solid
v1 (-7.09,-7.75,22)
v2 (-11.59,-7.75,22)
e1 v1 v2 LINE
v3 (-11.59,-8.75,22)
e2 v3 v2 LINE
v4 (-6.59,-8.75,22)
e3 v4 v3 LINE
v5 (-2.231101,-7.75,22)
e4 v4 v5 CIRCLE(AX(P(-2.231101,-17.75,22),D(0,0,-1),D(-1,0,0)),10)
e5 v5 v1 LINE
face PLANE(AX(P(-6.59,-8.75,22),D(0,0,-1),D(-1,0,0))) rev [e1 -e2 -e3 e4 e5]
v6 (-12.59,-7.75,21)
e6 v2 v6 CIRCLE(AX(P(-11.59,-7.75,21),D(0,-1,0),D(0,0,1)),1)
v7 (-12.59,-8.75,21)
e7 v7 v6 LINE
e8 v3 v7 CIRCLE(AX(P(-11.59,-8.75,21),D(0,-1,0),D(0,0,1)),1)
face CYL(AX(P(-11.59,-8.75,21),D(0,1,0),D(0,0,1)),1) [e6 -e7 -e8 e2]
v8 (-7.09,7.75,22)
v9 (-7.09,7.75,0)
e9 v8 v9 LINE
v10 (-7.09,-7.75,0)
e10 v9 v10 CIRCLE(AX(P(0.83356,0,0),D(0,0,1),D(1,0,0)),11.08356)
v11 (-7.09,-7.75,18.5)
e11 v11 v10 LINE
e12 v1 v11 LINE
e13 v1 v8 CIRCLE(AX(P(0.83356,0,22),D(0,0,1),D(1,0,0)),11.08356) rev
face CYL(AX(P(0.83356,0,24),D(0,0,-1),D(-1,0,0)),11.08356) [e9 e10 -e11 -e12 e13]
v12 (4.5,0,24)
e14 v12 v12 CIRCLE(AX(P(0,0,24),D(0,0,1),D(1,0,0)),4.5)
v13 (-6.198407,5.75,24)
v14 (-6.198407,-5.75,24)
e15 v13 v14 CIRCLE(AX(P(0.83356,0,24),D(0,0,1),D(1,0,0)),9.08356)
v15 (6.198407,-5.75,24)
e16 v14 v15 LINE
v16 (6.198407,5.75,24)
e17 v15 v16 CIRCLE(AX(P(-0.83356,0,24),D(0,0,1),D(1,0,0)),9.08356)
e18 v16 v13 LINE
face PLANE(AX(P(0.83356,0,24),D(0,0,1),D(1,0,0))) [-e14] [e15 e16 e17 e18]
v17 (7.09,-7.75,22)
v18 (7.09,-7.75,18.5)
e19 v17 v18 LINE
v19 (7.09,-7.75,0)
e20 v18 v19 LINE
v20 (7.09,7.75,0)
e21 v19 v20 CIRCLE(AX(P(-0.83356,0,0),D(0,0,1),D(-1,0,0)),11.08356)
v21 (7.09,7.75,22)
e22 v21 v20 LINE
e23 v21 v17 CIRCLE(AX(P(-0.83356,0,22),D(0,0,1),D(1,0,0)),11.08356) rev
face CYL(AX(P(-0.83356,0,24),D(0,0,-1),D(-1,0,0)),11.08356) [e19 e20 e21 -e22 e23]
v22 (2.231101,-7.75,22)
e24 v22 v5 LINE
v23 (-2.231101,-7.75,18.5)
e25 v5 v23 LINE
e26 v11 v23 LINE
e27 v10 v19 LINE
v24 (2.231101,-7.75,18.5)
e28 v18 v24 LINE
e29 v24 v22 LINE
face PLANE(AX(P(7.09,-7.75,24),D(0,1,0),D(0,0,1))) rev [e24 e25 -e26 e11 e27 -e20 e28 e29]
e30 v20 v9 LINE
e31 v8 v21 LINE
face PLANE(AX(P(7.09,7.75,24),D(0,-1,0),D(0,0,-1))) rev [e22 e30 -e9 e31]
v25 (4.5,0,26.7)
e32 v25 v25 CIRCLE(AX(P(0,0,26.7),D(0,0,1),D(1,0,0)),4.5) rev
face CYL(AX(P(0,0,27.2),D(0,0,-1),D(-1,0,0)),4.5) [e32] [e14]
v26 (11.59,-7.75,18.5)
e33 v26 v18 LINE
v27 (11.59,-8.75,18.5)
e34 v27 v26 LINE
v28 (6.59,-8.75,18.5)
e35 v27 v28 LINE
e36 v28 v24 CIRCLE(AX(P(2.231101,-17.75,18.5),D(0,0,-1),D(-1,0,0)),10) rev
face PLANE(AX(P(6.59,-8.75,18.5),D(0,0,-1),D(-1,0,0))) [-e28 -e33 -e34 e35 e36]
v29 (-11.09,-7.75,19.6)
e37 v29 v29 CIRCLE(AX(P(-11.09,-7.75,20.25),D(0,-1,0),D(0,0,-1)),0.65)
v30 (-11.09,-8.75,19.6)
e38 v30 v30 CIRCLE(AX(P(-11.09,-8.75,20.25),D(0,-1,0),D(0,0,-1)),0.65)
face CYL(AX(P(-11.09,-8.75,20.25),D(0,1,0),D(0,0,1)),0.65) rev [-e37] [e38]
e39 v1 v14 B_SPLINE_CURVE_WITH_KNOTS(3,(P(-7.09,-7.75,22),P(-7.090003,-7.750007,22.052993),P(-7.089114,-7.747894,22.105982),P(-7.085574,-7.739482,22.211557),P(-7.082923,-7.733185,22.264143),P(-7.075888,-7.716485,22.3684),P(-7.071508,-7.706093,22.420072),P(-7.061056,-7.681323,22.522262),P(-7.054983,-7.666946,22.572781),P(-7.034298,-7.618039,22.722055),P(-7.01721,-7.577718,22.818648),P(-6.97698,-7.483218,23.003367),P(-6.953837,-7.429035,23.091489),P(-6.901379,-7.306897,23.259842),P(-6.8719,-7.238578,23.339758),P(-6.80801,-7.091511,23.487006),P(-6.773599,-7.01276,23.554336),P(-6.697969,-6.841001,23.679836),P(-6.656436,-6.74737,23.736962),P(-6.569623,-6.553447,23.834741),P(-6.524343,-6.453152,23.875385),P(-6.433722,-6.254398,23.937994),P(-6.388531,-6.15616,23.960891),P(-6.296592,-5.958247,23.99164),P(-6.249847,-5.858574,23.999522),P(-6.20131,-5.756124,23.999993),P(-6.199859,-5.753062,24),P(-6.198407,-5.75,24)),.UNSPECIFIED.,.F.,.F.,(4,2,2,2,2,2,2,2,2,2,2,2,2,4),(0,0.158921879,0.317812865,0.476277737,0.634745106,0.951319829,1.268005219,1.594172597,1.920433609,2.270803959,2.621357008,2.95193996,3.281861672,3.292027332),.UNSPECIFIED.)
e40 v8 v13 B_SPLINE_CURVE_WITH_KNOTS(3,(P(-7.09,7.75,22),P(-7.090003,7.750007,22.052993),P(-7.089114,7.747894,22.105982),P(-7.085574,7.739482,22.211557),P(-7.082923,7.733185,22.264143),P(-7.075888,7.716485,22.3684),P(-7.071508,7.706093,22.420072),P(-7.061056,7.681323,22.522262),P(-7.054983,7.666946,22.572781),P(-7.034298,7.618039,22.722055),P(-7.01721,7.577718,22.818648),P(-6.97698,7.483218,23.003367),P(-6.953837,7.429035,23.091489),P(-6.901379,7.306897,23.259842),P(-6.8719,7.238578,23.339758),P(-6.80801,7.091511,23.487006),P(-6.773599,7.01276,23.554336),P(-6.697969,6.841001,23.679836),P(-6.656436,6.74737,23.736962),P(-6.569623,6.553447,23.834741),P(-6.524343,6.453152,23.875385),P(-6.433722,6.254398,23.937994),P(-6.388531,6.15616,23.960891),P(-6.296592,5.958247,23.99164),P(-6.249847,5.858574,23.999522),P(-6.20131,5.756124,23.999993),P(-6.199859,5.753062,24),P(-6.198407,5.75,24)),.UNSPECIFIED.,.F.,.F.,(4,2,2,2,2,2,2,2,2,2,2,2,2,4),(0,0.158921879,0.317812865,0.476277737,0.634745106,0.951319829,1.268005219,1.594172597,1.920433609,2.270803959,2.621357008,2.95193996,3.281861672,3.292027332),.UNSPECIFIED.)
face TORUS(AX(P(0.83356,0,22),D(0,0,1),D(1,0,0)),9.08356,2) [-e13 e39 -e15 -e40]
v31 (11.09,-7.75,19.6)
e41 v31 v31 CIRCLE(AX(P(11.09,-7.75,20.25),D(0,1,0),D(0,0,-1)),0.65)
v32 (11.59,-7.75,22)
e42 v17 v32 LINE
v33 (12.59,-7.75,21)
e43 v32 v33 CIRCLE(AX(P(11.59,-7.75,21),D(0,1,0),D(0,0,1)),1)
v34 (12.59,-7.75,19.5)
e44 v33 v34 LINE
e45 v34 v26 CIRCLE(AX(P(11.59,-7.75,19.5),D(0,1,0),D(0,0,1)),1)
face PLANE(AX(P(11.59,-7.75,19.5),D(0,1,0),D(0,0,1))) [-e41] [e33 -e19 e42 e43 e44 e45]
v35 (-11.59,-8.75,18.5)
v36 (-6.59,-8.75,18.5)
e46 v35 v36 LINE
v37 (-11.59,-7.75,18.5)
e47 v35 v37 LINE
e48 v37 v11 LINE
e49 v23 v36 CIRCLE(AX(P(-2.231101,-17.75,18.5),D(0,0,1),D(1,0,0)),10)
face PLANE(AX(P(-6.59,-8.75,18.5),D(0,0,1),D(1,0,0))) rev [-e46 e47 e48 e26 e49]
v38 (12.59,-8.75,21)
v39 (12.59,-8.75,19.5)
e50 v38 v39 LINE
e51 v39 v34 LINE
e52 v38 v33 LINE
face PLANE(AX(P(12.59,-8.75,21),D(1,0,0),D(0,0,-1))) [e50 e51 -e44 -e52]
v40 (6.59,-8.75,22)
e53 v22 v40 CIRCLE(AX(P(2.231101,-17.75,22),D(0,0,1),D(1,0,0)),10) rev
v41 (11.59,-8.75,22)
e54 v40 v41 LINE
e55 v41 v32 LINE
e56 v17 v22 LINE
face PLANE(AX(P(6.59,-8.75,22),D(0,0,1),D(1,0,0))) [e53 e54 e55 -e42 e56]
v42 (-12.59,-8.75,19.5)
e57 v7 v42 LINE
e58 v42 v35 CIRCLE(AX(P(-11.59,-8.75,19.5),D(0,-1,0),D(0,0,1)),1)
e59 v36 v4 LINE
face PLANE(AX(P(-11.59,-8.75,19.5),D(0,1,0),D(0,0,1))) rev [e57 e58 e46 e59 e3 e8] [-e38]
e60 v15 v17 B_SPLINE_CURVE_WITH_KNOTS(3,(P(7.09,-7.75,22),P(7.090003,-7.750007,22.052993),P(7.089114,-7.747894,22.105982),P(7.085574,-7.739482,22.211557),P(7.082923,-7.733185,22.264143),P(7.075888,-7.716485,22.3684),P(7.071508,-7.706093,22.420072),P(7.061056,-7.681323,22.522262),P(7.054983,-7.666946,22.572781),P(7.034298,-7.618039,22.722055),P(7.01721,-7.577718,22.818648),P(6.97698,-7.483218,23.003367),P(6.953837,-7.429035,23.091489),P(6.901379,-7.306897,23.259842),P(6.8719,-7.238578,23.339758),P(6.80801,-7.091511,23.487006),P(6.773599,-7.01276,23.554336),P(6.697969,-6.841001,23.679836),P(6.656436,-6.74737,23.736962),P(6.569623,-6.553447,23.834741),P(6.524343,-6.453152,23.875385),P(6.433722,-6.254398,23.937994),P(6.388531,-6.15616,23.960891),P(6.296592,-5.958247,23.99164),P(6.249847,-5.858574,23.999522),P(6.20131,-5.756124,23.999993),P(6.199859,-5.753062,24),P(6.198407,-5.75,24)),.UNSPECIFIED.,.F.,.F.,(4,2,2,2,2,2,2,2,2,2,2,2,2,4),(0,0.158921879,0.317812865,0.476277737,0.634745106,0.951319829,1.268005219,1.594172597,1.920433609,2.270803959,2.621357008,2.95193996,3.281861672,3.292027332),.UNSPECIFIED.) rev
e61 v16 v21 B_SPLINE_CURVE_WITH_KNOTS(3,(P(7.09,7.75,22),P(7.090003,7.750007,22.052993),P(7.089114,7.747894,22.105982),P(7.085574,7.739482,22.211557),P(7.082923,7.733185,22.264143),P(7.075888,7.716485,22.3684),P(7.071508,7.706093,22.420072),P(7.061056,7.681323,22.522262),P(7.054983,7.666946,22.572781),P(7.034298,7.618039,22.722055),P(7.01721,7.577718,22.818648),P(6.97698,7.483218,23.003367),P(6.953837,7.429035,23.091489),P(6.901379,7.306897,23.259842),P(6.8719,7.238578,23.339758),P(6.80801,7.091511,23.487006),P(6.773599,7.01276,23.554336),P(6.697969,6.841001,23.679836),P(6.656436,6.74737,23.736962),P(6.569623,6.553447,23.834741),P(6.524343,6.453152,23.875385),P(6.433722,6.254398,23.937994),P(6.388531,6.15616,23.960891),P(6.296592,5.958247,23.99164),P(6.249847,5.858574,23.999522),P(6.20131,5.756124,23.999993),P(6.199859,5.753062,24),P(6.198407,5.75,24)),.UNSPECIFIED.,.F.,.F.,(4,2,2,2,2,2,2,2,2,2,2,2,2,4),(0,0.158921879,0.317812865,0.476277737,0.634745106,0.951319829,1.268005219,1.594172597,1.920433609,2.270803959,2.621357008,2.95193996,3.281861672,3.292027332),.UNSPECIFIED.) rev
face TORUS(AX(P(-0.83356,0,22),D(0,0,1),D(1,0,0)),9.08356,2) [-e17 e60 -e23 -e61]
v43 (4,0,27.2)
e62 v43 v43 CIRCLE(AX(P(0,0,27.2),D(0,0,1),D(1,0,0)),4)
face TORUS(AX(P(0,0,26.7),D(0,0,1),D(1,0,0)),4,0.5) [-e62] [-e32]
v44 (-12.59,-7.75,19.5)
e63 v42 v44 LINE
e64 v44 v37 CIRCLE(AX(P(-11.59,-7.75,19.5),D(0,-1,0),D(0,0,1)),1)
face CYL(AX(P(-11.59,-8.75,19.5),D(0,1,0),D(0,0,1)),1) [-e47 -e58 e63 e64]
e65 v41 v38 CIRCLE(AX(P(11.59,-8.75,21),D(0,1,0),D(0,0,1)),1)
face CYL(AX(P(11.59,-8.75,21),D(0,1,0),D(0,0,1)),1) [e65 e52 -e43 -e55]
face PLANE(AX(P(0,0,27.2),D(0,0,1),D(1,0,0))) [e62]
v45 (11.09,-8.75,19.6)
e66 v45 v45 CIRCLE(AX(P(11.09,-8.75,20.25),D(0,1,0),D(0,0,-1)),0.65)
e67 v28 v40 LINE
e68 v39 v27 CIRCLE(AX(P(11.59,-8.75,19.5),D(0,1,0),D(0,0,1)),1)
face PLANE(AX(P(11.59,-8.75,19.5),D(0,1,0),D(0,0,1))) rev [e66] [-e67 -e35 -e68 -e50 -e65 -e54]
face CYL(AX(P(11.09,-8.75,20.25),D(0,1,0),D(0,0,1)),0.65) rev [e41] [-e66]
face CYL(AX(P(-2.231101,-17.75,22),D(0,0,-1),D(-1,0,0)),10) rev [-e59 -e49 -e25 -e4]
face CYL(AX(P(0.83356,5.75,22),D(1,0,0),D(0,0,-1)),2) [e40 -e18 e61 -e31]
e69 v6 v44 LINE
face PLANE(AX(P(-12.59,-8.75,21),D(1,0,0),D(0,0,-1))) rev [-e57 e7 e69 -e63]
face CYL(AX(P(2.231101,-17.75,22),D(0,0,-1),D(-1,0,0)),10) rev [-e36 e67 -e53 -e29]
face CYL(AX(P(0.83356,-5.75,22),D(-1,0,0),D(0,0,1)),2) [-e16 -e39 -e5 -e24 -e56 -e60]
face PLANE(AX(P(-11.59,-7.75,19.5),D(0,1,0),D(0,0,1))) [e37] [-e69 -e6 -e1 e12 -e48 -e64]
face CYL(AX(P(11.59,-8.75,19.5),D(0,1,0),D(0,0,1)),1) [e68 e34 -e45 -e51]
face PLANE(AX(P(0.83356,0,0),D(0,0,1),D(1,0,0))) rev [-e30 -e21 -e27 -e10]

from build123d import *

# Parameters (mm, degrees)
SALIENTE_EXTRUIR1_DEPTH  = 24
REDONDEO1_R              = 2
CROQUIS2_R               = 4.5
SALIENTE_EXTRUIR2_DEPTH  = 3.2
REDONDEO2_R              = 0.5
CROQUIS3_R               = 0.65
SALIENTE_EXTRUIR3_DEPTH  = 1
REDONDEO3_R              = 10
REDONDEO3_OF_SIMETR_A1_R = 10


with BuildPart() as part:
    # Croquis1 → Saliente-Extruir1 (new body)
    with BuildSketch(Plane.XY):
        with BuildLine():
            Line((7.09, 7.75), (-7.09, 7.75))
            ThreePointArc((-7.09, 7.75), (-10.25, 0), (-7.09, -7.75))
            Line((-7.09, -7.75), (7.09, -7.75))
            ThreePointArc((7.09, -7.75), (10.25, 0), (7.09, 7.75))
        make_face()
    extrude(amount=SALIENTE_EXTRUIR1_DEPTH)

    # Redondeo1
    redondeo1_edges = [part.edges().sort_by_distance(p)[0] for p in [
        (10.25, 0, 24),
        (0, 7.75, 24),
        (-10.25, 0, 24),
        (0, -7.75, 24),
    ]]
    fillet(redondeo1_edges, radius=REDONDEO1_R)

    # Croquis2 → Saliente-Extruir2 (add)
    with BuildSketch(Plane.XY.offset(24)):
        Circle(CROQUIS2_R)
    extrude(amount=SALIENTE_EXTRUIR2_DEPTH)

    # Redondeo2
    redondeo2_edges = [part.edges().sort_by_distance(p)[0] for p in [
        (-4.5, 0, 27.2),
    ]]
    fillet(redondeo2_edges, radius=REDONDEO2_R)

    # Croquis3 → Saliente-Extruir3 (add)
    with BuildSketch(Plane.XZ.offset(7.75)):
        with BuildLine():
            Line((-6.59, 22), (-11.59, 22))
            ThreePointArc((-11.59, 22), (-12.297106781, 21.707106781), (-12.59, 21))
            Line((-12.59, 21), (-12.59, 19.5))
            ThreePointArc((-12.59, 19.5), (-12.297106781, 18.792893219), (-11.59, 18.5))
            Line((-11.59, 18.5), (-6.59, 18.5))
            Line((-6.59, 18.5), (-6.59, 22))
        make_face()
        with Locations(Location((-11.09, 20.25, 0), (0, 0, 270))):
            Circle(CROQUIS3_R, mode=Mode.SUBTRACT)
    saliente_extruir3 = extrude(amount=SALIENTE_EXTRUIR3_DEPTH)

    # Redondeo3
    # the kernel refuses this fillet: 10 mm, written as the material it adds along each edge
    with BuildSketch(Plane(origin=(-6.59, -7.75, 18.5), x_dir=(1, 0, 0), z_dir=(0, 0, 1))) as redondeo3_piece_1:
        with BuildLine():
            CenterArc((4.358898944, -10), REDONDEO3_R, 90, 25.841932763)
            Line((0, -1), (-0.087177979, -0.82))
            ThreePointArc((-0.087177979, -0.82), (-0.2, -0.5), (-0.2, 0))
            Line((-0.2, 0), (0, 0.2))
            Line((0, 0.2), (4.358898944, 0.2))
            Line((4.358898944, 0.2), (4.358898944, 0))
        make_face()
    extrude(amount=3.5)

    # Simetría1: Saliente-Extruir3 across plane
    add(saliente_extruir3.mirror(Plane(origin=(0, 0, 0), x_dir=(0, 0, 1), z_dir=(1, 0, 0))))

    # Redondeo3 of Simetría1
    # the kernel refuses this fillet: 10 mm, written as the material it adds along each edge
    with BuildSketch(Plane(origin=(6.59, -7.75, 18.5), x_dir=(-1, 0, 0), z_dir=(0, 0, 1))) as redondeo3_of_simetr_a1_piece_1:
        with BuildLine():
            CenterArc((4.358898944, 10), REDONDEO3_OF_SIMETR_A1_R, 244.158067237, 25.841932763)
            Line((0, 1), (-0.087177979, 0.82))
            ThreePointArc((-0.087177979, 0.82), (-0.2, 0.5), (-0.2, 0))
            Line((-0.2, 0), (0, -0.2))
            Line((0, -0.2), (4.358898944, -0.2))
            Line((4.358898944, -0.2), (4.358898944, 0))
        make_face()
    extrude(amount=3.5)


solid = part.part
